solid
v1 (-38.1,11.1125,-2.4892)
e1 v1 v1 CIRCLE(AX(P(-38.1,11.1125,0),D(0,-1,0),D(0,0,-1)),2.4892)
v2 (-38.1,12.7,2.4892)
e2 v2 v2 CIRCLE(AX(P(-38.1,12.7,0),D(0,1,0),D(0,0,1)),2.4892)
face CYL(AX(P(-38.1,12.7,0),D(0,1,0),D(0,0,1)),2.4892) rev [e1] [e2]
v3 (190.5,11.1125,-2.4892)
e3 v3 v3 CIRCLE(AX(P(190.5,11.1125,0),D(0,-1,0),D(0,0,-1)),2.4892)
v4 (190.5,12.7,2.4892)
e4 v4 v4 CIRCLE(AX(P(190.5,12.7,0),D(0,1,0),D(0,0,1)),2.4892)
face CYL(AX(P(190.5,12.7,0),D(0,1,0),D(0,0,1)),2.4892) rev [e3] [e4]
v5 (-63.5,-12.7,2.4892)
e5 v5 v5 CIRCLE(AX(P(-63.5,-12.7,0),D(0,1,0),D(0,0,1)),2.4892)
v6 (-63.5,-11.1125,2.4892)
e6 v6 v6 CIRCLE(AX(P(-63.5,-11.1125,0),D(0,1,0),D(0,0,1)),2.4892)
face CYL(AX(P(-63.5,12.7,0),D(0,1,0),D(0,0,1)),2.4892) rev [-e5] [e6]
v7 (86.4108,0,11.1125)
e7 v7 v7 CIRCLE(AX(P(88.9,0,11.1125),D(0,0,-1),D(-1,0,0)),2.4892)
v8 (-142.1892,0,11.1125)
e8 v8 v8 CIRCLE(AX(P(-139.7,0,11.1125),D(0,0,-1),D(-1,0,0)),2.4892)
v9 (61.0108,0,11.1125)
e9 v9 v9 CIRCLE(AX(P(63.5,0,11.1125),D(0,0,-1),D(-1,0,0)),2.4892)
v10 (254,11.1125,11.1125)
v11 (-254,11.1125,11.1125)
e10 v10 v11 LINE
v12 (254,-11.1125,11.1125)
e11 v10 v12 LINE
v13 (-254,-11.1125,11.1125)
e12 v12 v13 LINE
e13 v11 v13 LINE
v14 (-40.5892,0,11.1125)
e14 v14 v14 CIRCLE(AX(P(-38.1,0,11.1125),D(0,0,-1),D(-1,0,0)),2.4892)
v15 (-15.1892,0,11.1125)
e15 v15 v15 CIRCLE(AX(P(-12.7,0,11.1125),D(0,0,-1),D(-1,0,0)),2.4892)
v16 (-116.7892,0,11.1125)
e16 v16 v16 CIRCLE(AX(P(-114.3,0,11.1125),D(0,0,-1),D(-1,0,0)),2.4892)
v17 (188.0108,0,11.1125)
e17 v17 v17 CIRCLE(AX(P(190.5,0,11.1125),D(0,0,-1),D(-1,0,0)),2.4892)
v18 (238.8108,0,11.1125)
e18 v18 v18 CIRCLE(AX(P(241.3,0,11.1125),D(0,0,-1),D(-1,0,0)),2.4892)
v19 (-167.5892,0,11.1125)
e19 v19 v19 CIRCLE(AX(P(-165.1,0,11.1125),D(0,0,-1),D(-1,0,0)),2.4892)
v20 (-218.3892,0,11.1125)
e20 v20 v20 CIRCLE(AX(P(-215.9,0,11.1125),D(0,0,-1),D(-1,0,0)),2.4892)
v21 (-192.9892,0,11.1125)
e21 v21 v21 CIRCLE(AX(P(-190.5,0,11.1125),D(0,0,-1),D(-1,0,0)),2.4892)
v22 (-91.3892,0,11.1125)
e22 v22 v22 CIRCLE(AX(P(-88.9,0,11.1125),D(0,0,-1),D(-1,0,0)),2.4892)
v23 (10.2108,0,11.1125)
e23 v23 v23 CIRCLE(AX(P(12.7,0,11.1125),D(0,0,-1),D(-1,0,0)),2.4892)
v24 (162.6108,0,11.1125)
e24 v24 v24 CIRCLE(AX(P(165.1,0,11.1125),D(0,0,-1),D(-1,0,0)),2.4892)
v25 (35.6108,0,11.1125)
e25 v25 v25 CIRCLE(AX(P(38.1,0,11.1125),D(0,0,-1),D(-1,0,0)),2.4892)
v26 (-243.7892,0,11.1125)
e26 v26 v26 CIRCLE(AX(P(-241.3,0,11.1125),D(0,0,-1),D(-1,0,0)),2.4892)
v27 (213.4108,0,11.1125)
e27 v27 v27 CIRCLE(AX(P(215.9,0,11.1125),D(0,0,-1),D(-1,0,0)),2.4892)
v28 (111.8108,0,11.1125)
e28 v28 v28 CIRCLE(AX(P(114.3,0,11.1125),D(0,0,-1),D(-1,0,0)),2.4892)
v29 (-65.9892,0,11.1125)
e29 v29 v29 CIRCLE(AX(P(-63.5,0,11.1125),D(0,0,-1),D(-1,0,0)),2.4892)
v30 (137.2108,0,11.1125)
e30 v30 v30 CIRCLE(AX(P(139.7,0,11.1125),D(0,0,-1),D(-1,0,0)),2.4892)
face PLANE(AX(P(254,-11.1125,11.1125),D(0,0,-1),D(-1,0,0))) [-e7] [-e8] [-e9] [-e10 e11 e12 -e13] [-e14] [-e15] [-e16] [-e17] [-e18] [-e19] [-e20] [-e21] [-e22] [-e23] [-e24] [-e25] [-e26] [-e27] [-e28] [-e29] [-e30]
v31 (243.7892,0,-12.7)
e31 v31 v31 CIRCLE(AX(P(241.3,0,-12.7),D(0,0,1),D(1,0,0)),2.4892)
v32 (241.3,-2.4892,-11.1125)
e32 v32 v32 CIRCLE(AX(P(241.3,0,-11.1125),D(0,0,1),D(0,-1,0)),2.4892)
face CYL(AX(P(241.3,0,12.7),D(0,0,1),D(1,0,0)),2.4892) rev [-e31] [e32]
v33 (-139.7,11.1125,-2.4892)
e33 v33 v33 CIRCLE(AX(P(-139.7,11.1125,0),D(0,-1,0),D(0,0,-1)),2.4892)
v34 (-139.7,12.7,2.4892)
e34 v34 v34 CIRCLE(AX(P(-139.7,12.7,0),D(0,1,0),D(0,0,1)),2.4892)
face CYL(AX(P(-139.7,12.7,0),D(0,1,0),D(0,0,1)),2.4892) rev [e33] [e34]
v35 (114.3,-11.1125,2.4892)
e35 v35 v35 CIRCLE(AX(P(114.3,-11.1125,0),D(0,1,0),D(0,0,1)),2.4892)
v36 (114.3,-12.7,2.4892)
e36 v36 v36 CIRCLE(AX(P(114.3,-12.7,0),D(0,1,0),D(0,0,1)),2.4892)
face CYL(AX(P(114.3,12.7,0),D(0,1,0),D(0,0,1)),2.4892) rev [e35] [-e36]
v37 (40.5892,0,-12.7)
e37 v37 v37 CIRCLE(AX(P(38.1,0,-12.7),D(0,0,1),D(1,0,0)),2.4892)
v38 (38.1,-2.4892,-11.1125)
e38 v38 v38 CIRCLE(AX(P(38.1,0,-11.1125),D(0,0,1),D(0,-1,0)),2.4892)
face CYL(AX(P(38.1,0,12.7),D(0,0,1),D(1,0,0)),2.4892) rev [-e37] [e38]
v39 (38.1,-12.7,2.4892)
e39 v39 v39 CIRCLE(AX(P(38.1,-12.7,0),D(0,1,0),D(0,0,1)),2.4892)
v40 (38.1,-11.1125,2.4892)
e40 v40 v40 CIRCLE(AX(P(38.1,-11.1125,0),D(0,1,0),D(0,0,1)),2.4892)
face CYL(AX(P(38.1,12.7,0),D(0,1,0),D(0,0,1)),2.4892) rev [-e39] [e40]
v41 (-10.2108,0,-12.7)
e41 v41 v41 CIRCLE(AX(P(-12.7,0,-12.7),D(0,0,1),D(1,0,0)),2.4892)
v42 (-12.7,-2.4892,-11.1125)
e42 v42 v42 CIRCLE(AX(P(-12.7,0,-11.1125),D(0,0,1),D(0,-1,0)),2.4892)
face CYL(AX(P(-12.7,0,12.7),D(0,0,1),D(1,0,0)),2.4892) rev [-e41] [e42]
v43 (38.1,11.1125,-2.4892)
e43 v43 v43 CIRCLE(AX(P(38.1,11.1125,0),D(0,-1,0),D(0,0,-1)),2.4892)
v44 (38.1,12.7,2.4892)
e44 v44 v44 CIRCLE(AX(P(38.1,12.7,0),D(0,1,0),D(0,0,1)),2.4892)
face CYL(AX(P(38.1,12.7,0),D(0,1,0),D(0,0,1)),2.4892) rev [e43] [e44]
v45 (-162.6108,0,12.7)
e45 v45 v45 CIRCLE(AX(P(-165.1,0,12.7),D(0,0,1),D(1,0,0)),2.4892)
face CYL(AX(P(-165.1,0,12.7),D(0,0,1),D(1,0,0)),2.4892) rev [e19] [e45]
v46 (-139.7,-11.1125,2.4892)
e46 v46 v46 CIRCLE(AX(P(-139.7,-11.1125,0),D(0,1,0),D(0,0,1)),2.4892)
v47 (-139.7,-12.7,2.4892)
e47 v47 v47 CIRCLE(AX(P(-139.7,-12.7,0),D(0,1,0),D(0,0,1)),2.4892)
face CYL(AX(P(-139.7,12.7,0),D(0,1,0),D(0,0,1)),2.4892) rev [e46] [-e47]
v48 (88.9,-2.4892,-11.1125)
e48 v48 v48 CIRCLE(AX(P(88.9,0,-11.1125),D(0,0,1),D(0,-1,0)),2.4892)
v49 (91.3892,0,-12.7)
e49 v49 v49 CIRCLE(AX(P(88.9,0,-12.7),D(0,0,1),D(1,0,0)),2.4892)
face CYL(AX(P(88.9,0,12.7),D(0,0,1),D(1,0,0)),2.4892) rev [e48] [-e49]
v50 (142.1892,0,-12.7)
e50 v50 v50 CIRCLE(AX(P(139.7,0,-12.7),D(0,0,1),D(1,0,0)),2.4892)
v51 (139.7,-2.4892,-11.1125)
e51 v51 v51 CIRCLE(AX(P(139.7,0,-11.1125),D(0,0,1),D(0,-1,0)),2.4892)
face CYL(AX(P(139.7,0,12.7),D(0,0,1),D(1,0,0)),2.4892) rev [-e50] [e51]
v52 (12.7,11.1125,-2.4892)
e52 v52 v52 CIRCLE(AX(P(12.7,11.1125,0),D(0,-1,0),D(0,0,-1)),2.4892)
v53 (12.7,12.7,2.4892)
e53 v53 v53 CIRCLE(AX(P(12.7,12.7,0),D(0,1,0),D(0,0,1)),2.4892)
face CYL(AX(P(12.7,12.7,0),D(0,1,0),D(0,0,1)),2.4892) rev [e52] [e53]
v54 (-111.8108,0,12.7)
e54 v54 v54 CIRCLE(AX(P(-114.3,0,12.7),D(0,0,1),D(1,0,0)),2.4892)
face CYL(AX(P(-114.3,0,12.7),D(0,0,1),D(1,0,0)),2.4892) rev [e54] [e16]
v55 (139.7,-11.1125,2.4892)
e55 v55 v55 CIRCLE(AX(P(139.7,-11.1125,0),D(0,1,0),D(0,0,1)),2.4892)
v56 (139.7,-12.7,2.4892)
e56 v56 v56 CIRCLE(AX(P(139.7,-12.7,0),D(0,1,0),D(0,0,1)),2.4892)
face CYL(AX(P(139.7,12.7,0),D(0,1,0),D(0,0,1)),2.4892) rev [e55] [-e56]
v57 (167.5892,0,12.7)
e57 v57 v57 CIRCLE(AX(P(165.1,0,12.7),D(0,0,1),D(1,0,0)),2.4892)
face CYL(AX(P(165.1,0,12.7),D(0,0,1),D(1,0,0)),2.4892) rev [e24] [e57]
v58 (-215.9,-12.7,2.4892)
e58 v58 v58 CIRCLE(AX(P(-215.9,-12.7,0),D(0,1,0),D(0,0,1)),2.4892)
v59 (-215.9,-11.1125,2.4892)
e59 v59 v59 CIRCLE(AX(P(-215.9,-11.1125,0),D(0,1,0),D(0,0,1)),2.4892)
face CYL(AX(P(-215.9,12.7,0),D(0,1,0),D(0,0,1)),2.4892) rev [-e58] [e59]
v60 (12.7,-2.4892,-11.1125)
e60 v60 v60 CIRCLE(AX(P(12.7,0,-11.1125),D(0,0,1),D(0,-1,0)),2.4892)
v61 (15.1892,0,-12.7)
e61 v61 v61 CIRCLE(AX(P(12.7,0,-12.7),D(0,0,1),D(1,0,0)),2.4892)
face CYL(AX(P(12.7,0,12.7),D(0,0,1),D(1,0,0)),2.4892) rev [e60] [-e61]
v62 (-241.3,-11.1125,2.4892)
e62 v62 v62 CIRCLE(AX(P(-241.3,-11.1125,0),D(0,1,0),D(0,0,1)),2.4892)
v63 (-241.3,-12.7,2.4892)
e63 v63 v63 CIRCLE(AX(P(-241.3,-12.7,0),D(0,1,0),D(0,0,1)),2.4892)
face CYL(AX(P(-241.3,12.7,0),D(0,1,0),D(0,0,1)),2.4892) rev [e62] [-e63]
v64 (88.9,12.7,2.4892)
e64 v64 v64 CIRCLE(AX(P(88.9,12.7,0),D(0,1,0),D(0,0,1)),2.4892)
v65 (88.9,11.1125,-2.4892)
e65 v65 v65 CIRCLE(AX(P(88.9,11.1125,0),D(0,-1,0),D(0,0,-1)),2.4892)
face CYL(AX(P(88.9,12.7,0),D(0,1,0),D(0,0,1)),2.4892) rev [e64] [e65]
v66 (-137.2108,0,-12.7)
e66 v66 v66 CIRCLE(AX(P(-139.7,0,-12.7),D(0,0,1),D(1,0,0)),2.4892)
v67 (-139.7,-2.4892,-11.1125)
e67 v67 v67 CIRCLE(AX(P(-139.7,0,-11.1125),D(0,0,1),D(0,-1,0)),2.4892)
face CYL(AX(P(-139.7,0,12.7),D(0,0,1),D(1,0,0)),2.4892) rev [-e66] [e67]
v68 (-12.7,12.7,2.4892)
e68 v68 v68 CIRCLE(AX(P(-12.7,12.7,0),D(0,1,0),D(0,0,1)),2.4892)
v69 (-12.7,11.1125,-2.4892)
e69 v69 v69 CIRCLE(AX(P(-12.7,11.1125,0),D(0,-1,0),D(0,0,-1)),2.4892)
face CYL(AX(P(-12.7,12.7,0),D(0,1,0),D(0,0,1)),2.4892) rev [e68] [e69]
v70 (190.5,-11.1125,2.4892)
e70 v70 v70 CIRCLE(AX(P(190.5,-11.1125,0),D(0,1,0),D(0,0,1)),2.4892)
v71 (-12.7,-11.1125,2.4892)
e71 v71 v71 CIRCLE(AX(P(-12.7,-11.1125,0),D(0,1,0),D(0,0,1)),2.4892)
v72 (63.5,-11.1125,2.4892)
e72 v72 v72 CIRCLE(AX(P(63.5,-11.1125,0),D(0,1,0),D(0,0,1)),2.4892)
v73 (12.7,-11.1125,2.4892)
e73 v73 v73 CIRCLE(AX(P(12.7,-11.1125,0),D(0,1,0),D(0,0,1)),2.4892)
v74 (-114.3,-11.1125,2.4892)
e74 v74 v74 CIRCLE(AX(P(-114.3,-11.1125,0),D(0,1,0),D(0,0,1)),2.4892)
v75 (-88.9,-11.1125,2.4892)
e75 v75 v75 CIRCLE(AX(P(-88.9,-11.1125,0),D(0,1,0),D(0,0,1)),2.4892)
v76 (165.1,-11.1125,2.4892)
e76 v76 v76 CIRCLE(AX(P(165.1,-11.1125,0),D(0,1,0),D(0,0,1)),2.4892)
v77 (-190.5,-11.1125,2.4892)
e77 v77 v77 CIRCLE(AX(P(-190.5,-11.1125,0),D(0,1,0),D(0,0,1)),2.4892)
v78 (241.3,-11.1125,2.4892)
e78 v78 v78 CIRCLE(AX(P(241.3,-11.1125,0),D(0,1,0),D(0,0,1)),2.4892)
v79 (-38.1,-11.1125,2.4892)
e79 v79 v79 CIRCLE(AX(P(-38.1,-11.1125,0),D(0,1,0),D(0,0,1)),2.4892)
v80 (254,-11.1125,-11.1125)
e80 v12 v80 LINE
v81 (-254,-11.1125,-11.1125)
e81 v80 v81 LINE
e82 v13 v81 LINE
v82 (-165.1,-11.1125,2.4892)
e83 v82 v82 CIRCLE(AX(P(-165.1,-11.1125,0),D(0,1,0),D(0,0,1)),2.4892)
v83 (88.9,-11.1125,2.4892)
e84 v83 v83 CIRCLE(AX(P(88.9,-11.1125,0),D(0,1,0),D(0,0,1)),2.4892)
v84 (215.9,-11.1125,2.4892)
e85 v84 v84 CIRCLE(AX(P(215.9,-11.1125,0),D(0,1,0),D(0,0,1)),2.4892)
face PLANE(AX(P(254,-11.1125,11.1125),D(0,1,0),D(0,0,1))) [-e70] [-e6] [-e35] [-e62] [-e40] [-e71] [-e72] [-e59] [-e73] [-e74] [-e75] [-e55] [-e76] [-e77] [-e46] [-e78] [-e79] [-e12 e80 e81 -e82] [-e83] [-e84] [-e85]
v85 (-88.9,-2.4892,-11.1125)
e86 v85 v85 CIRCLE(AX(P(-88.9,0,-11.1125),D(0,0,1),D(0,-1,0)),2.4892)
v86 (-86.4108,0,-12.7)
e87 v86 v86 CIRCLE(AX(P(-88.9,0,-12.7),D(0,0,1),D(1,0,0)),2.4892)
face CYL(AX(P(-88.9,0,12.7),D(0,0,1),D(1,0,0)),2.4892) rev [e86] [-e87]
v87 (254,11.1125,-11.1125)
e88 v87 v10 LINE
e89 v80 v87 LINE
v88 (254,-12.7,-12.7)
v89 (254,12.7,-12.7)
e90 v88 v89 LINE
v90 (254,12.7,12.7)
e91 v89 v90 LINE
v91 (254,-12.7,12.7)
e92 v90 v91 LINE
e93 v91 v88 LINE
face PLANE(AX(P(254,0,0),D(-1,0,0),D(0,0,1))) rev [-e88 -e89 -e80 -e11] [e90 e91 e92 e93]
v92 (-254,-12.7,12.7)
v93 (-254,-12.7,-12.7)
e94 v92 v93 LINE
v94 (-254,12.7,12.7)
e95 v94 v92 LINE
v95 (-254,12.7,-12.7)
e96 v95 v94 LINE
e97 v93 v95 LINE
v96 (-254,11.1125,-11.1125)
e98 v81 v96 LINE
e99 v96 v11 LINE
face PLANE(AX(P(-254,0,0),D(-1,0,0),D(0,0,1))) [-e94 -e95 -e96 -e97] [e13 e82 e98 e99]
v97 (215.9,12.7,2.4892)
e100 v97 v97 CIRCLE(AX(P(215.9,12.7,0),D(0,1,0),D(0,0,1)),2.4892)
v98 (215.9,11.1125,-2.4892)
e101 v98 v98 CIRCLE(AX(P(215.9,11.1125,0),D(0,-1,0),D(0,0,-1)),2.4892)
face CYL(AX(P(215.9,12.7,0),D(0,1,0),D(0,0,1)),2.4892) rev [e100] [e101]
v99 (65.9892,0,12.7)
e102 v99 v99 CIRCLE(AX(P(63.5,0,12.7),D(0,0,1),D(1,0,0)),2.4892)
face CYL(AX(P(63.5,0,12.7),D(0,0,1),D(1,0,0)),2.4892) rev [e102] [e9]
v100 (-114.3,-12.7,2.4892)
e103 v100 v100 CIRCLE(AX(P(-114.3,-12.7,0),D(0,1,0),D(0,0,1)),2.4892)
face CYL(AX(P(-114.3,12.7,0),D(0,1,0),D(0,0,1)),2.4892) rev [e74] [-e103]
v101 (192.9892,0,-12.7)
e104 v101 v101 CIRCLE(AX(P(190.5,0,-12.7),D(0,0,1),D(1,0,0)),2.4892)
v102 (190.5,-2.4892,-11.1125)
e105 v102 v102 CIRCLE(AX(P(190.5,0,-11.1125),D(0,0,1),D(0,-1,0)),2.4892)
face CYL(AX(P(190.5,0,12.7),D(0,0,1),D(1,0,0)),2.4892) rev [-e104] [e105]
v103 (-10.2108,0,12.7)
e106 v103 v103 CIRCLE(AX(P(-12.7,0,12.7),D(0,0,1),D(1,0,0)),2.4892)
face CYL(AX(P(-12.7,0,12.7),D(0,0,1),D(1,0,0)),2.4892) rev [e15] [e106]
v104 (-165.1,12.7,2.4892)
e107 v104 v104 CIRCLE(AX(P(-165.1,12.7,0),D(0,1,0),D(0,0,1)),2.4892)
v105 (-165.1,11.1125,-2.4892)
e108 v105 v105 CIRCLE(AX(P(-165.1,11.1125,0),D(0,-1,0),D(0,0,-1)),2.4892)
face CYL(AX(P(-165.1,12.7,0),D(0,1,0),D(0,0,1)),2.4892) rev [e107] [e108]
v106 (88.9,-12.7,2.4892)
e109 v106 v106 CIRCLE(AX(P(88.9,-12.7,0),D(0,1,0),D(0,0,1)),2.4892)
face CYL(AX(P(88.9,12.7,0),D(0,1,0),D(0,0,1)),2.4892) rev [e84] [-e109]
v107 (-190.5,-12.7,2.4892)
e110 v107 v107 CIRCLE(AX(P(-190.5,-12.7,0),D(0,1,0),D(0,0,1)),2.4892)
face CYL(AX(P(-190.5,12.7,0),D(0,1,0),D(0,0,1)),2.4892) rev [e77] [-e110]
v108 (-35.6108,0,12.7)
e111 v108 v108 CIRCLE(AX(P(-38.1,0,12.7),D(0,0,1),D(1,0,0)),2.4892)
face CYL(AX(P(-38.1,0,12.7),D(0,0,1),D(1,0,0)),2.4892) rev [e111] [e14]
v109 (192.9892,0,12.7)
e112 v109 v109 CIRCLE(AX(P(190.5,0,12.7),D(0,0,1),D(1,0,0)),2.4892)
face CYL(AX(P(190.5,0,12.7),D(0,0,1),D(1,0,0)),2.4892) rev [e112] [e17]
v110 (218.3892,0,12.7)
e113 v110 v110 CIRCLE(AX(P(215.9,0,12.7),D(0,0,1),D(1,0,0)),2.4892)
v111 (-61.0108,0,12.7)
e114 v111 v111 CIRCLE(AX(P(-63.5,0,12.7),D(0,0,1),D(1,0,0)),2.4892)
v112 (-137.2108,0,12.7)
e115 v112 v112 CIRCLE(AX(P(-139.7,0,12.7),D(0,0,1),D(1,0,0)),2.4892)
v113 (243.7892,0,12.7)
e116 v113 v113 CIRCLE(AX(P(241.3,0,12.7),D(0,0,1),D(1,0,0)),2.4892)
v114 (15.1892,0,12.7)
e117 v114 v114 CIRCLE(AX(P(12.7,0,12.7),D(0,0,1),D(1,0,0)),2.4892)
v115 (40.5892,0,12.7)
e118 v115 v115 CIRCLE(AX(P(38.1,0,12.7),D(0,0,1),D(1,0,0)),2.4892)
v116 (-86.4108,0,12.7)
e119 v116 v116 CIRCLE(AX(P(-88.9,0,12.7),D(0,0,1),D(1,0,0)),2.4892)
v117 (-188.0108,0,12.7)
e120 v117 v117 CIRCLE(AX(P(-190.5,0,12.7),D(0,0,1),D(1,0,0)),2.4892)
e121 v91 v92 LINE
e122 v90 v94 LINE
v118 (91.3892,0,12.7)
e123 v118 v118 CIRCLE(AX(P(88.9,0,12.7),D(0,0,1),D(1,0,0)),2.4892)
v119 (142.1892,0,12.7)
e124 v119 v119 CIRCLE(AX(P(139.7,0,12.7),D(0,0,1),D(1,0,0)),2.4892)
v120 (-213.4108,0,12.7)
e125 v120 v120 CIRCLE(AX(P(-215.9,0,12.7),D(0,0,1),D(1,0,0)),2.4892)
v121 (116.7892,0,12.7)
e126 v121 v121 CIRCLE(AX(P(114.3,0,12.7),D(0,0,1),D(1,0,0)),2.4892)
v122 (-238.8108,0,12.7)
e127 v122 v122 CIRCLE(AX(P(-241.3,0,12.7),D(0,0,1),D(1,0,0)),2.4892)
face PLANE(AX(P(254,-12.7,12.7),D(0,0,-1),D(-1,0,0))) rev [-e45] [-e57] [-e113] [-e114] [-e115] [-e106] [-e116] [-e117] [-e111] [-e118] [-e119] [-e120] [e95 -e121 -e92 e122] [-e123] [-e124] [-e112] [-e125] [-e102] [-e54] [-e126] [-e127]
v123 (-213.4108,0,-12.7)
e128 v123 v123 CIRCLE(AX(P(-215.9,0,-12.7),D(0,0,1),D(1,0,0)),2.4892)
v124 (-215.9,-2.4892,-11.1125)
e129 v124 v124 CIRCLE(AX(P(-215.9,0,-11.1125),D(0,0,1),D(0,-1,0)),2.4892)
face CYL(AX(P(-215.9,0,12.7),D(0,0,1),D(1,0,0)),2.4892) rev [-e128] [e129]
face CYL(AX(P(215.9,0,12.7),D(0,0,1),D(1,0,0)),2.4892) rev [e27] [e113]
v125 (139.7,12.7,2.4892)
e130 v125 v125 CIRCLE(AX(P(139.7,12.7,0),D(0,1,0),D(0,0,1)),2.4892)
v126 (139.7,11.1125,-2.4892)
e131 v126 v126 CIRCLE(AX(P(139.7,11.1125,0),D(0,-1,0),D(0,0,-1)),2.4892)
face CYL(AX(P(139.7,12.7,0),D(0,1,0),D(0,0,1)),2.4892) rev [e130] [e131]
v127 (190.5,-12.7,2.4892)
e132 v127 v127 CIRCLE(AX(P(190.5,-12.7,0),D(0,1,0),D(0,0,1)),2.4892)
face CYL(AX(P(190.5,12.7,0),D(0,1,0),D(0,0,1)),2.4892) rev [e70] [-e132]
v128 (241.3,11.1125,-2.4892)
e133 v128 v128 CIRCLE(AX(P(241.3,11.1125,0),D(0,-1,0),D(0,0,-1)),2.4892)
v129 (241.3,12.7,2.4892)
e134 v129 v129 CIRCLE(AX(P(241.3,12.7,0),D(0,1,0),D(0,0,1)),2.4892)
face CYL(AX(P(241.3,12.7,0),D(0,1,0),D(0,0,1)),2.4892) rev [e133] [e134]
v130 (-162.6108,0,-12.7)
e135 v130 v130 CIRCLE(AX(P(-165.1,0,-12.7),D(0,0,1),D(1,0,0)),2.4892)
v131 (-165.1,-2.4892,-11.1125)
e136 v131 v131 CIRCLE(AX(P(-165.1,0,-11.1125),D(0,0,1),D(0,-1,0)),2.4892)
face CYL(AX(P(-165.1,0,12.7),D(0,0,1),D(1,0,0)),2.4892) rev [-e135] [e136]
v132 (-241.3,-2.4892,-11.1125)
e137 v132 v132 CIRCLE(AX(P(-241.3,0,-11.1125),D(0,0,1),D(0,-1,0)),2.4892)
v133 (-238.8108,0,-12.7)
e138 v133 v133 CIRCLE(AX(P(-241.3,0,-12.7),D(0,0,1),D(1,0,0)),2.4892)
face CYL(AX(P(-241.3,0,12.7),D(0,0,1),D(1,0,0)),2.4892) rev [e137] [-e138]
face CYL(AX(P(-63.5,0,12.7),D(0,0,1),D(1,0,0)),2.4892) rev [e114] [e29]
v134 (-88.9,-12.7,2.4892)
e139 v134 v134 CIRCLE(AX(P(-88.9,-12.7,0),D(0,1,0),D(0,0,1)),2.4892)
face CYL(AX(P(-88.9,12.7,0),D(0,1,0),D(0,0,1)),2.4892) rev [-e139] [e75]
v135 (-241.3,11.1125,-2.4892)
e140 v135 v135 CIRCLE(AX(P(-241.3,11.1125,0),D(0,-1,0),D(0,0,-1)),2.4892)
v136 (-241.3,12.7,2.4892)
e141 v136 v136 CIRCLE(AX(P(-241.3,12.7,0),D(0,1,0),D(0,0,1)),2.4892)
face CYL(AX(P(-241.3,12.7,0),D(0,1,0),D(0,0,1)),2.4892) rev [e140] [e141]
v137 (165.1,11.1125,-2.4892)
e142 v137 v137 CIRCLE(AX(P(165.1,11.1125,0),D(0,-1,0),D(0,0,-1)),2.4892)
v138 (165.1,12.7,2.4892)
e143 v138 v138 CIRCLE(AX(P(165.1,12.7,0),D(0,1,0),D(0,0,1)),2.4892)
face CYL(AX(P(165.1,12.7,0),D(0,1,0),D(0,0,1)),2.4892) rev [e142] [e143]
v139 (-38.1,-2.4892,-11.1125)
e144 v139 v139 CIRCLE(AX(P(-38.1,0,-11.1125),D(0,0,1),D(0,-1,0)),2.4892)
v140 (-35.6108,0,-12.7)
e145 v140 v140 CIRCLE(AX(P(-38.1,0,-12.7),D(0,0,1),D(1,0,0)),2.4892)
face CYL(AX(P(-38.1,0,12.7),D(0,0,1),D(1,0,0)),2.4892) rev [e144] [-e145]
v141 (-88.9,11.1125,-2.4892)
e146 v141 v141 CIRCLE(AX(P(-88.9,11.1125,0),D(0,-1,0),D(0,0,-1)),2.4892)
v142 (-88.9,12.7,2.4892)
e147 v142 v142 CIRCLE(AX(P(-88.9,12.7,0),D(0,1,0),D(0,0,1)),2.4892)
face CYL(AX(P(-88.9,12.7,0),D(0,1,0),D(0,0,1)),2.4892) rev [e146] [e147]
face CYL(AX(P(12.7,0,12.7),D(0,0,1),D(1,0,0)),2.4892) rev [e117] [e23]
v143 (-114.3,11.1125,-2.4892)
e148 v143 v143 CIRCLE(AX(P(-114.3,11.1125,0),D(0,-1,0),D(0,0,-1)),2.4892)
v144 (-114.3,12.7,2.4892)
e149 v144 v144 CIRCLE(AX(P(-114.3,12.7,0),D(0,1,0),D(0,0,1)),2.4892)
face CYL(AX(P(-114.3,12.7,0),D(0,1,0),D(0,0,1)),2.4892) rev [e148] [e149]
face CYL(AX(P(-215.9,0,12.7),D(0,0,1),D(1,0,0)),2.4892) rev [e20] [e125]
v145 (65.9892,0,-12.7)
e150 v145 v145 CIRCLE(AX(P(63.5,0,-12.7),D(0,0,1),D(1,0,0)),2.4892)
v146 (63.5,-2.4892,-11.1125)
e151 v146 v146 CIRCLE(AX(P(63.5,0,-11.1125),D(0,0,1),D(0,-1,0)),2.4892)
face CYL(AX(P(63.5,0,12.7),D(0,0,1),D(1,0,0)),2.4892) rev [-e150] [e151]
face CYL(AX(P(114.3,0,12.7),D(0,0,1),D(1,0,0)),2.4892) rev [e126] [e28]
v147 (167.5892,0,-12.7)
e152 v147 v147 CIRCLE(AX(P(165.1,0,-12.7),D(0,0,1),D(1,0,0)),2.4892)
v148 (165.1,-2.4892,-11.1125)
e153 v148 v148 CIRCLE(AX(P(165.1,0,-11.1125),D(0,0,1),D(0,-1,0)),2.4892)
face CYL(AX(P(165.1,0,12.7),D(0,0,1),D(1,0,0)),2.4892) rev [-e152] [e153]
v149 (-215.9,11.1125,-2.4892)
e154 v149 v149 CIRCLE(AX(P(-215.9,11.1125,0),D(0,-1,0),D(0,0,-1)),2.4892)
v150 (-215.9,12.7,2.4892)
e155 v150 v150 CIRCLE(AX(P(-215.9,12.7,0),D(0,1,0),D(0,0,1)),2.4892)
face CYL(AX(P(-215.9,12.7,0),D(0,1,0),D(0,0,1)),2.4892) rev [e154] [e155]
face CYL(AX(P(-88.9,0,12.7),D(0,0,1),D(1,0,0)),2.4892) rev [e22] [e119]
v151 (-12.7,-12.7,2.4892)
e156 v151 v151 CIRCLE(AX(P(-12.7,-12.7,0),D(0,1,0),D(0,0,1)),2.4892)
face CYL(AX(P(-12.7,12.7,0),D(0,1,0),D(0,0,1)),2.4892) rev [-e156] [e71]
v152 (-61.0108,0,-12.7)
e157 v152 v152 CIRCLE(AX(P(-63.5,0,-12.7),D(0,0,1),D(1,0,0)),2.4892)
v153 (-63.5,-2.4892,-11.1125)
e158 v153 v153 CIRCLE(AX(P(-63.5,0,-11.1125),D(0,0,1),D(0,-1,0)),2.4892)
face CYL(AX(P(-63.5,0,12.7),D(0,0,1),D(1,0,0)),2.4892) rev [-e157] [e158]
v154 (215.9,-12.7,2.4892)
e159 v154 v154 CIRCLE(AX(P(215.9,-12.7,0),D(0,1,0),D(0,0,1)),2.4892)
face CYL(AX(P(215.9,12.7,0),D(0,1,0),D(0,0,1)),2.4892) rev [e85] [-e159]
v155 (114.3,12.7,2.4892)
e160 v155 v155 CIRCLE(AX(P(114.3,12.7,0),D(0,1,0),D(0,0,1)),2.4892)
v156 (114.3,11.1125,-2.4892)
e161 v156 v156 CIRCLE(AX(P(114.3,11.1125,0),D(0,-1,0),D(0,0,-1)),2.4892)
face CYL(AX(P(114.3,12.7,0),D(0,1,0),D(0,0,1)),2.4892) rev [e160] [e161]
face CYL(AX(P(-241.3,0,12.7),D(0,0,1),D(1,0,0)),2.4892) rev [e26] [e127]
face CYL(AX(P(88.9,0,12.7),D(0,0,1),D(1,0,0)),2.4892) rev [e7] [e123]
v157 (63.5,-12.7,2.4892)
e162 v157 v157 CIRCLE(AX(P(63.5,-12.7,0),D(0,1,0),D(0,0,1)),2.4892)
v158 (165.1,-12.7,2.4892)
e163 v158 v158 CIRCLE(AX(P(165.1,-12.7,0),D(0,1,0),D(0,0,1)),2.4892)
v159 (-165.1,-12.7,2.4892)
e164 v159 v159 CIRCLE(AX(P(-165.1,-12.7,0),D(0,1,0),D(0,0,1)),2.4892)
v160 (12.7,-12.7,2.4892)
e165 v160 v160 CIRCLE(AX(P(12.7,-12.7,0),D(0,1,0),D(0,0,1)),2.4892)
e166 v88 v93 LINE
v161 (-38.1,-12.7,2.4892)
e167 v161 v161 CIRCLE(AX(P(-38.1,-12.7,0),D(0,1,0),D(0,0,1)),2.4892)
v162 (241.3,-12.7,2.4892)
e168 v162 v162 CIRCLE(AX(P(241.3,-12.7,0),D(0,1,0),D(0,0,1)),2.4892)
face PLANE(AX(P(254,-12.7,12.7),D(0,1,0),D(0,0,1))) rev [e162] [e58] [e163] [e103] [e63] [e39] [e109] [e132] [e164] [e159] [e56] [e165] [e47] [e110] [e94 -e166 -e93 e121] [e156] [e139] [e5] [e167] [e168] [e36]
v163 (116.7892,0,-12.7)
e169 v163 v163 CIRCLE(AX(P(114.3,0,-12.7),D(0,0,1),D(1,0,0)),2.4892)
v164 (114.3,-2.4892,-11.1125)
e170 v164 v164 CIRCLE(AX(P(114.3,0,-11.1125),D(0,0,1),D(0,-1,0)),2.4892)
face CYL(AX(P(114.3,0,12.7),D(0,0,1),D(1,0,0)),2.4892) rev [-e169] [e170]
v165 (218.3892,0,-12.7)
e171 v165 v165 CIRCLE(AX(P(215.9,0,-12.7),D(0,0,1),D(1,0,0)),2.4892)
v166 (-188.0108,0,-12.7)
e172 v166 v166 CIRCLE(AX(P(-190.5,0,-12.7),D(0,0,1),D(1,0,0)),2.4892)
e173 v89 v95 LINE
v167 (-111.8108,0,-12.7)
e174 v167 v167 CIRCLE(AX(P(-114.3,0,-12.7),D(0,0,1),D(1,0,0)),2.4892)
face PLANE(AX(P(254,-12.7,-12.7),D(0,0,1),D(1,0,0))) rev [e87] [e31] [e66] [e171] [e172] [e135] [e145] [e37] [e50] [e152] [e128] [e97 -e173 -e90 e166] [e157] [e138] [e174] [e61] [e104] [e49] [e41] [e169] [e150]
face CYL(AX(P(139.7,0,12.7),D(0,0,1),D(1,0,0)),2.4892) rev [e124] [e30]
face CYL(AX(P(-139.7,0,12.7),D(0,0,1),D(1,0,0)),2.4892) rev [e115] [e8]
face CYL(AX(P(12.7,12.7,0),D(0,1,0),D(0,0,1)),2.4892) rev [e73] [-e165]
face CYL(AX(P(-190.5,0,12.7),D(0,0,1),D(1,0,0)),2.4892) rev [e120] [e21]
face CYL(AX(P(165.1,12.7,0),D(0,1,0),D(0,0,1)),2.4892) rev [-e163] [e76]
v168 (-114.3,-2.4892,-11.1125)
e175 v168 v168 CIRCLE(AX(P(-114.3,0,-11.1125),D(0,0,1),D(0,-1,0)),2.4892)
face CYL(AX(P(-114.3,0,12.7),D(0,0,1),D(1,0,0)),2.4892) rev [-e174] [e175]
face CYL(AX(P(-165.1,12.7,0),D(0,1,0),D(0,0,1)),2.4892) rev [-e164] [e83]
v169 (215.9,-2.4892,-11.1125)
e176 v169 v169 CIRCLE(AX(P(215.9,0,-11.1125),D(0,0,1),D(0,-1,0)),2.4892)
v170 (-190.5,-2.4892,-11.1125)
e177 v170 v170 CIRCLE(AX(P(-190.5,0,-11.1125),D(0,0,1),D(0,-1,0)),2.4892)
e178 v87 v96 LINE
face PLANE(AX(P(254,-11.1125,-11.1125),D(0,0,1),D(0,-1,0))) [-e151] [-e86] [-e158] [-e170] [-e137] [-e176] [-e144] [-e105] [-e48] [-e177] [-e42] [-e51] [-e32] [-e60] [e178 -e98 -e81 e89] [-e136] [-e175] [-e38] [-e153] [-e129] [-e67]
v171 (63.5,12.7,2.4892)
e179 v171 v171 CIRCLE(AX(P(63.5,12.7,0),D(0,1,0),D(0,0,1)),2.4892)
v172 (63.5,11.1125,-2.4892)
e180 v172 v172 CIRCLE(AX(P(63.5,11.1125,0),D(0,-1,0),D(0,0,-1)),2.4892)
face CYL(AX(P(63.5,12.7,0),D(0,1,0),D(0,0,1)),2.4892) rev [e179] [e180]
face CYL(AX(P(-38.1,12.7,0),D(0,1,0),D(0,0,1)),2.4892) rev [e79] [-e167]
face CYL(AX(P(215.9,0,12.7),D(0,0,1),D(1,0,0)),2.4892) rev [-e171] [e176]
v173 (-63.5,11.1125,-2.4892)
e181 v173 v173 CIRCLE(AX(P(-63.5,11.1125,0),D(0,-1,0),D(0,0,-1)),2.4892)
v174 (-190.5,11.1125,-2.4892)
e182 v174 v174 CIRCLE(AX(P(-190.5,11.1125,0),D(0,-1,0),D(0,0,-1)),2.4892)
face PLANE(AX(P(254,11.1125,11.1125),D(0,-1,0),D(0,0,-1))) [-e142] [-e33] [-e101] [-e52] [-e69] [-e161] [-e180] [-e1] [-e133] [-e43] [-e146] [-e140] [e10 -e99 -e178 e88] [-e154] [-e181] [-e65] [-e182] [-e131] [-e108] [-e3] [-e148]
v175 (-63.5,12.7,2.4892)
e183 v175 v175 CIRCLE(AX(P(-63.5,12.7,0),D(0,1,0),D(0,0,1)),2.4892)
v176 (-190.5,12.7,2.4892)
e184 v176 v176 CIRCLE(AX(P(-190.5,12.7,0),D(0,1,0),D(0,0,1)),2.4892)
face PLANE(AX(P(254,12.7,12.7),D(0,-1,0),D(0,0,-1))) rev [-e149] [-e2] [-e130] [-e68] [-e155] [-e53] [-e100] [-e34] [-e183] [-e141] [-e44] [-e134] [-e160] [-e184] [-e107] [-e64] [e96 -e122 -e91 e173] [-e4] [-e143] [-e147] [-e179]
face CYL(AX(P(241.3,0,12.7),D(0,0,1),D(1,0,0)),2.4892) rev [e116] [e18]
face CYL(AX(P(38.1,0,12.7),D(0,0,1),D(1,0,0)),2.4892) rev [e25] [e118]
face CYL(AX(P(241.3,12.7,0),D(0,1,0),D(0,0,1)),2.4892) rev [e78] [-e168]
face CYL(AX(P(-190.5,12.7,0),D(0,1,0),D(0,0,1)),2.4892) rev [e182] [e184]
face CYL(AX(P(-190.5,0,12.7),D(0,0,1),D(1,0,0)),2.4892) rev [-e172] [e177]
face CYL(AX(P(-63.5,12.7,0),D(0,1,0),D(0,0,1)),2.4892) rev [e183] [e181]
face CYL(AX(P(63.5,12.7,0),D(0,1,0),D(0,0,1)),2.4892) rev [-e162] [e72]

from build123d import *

# Parameters (mm, degrees)
SKETCH1_W             = 25.4
SKETCH1_H             = 25.4
SKETCH1_W_2           = 22.225
SKETCH1_H_2           = 22.225
BOSS_EXTRUDE1_DEPTH   = 254
SKETCH3_W             = 2.4892
SKETCH3_H             = 25.4
SKETCH3_AT_POINT_2_W  = 2.4892
SKETCH3_AT_POINT_2_H  = 25.4
LPATTERN1_START       = -12.7
LPATTERN1_OUTLINE_R   = 2.4892
LPATTERN1_DEPTH       = 25.4
LPATTERN1_2_OUTLINE_R = 2.4892
LPATTERN1_2_DEPTH     = 25.4


# Read off the part's stored shape, not the designer's step: LPattern1
with BuildPart() as part:
    # Sketch1 → Boss-Extrude1 (new, symmetric)
    with BuildSketch(Plane(origin=(0, 0, 0), x_dir=(0, 0, -1), z_dir=(1, 0, 0))):
        Rectangle(SKETCH1_W, SKETCH1_H)
        Rectangle(SKETCH1_W_2, SKETCH1_H_2, mode=Mode.SUBTRACT)
    extrude(amount=BOSS_EXTRUDE1_DEPTH, both=True)

    # Sketch3 → #9 (0.196) Diameter Hole1 (revolve, cut)
    with BuildSketch(Plane(origin=(241.3, 12.7, 0), x_dir=(0, 0, 1), z_dir=(1, 0, 0))):
        with Locations((1.2446, 12.7)):
            Rectangle(SKETCH3_W, SKETCH3_H)
    revolve(axis=Axis((241.3, 19.05, 0), (0, -1, 0)), mode=Mode.SUBTRACT)

    # Sketch3 at point 2 (carried to point 2, square into its face) → #9 (0.196) Diameter Hole1 at 2 (revolve, cut)
    with BuildSketch(Plane(origin=(241.3, 0, 12.7), x_dir=(0, -1, 0), z_dir=(1, 0, 0))):
        with Locations((1.2446, 12.7)):
            Rectangle(SKETCH3_AT_POINT_2_W, SKETCH3_AT_POINT_2_H)
    revolve(axis=Axis((241.3, 0, 19.05), (0, 0, -1)), mode=Mode.SUBTRACT)

    # LPattern1 outline → LPattern1 (cut)
    with BuildSketch(Plane.XY.offset(LPATTERN1_START)):
        with Locations((215.9, 0)):
            Circle(LPATTERN1_OUTLINE_R)
        with Locations((190.5, 0)):
            Circle(LPATTERN1_OUTLINE_R)
        with Locations((165.1, 0)):
            Circle(LPATTERN1_OUTLINE_R)
        with Locations((139.7, 0)):
            Circle(LPATTERN1_OUTLINE_R)
        with Locations((114.3, 0)):
            Circle(LPATTERN1_OUTLINE_R)
        with Locations((88.9, 0)):
            Circle(LPATTERN1_OUTLINE_R)
        with Locations((63.5, 0)):
            Circle(LPATTERN1_OUTLINE_R)
        with Locations((38.1, 0)):
            Circle(LPATTERN1_OUTLINE_R)
        with Locations((12.7, 0)):
            Circle(LPATTERN1_OUTLINE_R)
        with Locations((-12.7, 0)):
            Circle(LPATTERN1_OUTLINE_R)
        with Locations((-38.1, 0)):
            Circle(LPATTERN1_OUTLINE_R)
        with Locations((-63.5, 0)):
            Circle(LPATTERN1_OUTLINE_R)
        with Locations((-88.9, 0)):
            Circle(LPATTERN1_OUTLINE_R)
        with Locations((-114.3, 0)):
            Circle(LPATTERN1_OUTLINE_R)
        with Locations((-139.7, 0)):
            Circle(LPATTERN1_OUTLINE_R)
        with Locations((-165.1, 0)):
            Circle(LPATTERN1_OUTLINE_R)
        with Locations((-190.5, 0)):
            Circle(LPATTERN1_OUTLINE_R)
        with Locations((-215.9, 0)):
            Circle(LPATTERN1_OUTLINE_R)
        with Locations((-241.3, 0)):
            Circle(LPATTERN1_OUTLINE_R)
    extrude(amount=LPATTERN1_DEPTH, mode=Mode.SUBTRACT)

    # LPattern1 2 outline → LPattern1 2 (cut)
    with BuildSketch(Plane(origin=(0, 0, 0), x_dir=(1, 0, 0), z_dir=(0, 1, 0)).offset(LPATTERN1_START)):
        with Locations((215.9, 0)):
            Circle(LPATTERN1_2_OUTLINE_R)
        with Locations((190.5, 0)):
            Circle(LPATTERN1_2_OUTLINE_R)
        with Locations((165.1, 0)):
            Circle(LPATTERN1_2_OUTLINE_R)
        with Locations((139.7, 0)):
            Circle(LPATTERN1_2_OUTLINE_R)
        with Locations((114.3, 0)):
            Circle(LPATTERN1_2_OUTLINE_R)
        with Locations((88.9, 0)):
            Circle(LPATTERN1_2_OUTLINE_R)
        with Locations((63.5, 0)):
            Circle(LPATTERN1_2_OUTLINE_R)
        with Locations((38.1, 0)):
            Circle(LPATTERN1_2_OUTLINE_R)
        with Locations((12.7, 0)):
            Circle(LPATTERN1_2_OUTLINE_R)
        with Locations((-12.7, 0)):
            Circle(LPATTERN1_2_OUTLINE_R)
        with Locations((-38.1, 0)):
            Circle(LPATTERN1_2_OUTLINE_R)
        with Locations((-63.5, 0)):
            Circle(LPATTERN1_2_OUTLINE_R)
        with Locations((-88.9, 0)):
            Circle(LPATTERN1_2_OUTLINE_R)
        with Locations((-114.3, 0)):
            Circle(LPATTERN1_2_OUTLINE_R)
        with Locations((-139.7, 0)):
            Circle(LPATTERN1_2_OUTLINE_R)
        with Locations((-165.1, 0)):
            Circle(LPATTERN1_2_OUTLINE_R)
        with Locations((-190.5, 0)):
            Circle(LPATTERN1_2_OUTLINE_R)
        with Locations((-215.9, 0)):
            Circle(LPATTERN1_2_OUTLINE_R)
        with Locations((-241.3, 0)):
            Circle(LPATTERN1_2_OUTLINE_R)
    extrude(amount=LPATTERN1_2_DEPTH, mode=Mode.SUBTRACT)


solid = part.part
